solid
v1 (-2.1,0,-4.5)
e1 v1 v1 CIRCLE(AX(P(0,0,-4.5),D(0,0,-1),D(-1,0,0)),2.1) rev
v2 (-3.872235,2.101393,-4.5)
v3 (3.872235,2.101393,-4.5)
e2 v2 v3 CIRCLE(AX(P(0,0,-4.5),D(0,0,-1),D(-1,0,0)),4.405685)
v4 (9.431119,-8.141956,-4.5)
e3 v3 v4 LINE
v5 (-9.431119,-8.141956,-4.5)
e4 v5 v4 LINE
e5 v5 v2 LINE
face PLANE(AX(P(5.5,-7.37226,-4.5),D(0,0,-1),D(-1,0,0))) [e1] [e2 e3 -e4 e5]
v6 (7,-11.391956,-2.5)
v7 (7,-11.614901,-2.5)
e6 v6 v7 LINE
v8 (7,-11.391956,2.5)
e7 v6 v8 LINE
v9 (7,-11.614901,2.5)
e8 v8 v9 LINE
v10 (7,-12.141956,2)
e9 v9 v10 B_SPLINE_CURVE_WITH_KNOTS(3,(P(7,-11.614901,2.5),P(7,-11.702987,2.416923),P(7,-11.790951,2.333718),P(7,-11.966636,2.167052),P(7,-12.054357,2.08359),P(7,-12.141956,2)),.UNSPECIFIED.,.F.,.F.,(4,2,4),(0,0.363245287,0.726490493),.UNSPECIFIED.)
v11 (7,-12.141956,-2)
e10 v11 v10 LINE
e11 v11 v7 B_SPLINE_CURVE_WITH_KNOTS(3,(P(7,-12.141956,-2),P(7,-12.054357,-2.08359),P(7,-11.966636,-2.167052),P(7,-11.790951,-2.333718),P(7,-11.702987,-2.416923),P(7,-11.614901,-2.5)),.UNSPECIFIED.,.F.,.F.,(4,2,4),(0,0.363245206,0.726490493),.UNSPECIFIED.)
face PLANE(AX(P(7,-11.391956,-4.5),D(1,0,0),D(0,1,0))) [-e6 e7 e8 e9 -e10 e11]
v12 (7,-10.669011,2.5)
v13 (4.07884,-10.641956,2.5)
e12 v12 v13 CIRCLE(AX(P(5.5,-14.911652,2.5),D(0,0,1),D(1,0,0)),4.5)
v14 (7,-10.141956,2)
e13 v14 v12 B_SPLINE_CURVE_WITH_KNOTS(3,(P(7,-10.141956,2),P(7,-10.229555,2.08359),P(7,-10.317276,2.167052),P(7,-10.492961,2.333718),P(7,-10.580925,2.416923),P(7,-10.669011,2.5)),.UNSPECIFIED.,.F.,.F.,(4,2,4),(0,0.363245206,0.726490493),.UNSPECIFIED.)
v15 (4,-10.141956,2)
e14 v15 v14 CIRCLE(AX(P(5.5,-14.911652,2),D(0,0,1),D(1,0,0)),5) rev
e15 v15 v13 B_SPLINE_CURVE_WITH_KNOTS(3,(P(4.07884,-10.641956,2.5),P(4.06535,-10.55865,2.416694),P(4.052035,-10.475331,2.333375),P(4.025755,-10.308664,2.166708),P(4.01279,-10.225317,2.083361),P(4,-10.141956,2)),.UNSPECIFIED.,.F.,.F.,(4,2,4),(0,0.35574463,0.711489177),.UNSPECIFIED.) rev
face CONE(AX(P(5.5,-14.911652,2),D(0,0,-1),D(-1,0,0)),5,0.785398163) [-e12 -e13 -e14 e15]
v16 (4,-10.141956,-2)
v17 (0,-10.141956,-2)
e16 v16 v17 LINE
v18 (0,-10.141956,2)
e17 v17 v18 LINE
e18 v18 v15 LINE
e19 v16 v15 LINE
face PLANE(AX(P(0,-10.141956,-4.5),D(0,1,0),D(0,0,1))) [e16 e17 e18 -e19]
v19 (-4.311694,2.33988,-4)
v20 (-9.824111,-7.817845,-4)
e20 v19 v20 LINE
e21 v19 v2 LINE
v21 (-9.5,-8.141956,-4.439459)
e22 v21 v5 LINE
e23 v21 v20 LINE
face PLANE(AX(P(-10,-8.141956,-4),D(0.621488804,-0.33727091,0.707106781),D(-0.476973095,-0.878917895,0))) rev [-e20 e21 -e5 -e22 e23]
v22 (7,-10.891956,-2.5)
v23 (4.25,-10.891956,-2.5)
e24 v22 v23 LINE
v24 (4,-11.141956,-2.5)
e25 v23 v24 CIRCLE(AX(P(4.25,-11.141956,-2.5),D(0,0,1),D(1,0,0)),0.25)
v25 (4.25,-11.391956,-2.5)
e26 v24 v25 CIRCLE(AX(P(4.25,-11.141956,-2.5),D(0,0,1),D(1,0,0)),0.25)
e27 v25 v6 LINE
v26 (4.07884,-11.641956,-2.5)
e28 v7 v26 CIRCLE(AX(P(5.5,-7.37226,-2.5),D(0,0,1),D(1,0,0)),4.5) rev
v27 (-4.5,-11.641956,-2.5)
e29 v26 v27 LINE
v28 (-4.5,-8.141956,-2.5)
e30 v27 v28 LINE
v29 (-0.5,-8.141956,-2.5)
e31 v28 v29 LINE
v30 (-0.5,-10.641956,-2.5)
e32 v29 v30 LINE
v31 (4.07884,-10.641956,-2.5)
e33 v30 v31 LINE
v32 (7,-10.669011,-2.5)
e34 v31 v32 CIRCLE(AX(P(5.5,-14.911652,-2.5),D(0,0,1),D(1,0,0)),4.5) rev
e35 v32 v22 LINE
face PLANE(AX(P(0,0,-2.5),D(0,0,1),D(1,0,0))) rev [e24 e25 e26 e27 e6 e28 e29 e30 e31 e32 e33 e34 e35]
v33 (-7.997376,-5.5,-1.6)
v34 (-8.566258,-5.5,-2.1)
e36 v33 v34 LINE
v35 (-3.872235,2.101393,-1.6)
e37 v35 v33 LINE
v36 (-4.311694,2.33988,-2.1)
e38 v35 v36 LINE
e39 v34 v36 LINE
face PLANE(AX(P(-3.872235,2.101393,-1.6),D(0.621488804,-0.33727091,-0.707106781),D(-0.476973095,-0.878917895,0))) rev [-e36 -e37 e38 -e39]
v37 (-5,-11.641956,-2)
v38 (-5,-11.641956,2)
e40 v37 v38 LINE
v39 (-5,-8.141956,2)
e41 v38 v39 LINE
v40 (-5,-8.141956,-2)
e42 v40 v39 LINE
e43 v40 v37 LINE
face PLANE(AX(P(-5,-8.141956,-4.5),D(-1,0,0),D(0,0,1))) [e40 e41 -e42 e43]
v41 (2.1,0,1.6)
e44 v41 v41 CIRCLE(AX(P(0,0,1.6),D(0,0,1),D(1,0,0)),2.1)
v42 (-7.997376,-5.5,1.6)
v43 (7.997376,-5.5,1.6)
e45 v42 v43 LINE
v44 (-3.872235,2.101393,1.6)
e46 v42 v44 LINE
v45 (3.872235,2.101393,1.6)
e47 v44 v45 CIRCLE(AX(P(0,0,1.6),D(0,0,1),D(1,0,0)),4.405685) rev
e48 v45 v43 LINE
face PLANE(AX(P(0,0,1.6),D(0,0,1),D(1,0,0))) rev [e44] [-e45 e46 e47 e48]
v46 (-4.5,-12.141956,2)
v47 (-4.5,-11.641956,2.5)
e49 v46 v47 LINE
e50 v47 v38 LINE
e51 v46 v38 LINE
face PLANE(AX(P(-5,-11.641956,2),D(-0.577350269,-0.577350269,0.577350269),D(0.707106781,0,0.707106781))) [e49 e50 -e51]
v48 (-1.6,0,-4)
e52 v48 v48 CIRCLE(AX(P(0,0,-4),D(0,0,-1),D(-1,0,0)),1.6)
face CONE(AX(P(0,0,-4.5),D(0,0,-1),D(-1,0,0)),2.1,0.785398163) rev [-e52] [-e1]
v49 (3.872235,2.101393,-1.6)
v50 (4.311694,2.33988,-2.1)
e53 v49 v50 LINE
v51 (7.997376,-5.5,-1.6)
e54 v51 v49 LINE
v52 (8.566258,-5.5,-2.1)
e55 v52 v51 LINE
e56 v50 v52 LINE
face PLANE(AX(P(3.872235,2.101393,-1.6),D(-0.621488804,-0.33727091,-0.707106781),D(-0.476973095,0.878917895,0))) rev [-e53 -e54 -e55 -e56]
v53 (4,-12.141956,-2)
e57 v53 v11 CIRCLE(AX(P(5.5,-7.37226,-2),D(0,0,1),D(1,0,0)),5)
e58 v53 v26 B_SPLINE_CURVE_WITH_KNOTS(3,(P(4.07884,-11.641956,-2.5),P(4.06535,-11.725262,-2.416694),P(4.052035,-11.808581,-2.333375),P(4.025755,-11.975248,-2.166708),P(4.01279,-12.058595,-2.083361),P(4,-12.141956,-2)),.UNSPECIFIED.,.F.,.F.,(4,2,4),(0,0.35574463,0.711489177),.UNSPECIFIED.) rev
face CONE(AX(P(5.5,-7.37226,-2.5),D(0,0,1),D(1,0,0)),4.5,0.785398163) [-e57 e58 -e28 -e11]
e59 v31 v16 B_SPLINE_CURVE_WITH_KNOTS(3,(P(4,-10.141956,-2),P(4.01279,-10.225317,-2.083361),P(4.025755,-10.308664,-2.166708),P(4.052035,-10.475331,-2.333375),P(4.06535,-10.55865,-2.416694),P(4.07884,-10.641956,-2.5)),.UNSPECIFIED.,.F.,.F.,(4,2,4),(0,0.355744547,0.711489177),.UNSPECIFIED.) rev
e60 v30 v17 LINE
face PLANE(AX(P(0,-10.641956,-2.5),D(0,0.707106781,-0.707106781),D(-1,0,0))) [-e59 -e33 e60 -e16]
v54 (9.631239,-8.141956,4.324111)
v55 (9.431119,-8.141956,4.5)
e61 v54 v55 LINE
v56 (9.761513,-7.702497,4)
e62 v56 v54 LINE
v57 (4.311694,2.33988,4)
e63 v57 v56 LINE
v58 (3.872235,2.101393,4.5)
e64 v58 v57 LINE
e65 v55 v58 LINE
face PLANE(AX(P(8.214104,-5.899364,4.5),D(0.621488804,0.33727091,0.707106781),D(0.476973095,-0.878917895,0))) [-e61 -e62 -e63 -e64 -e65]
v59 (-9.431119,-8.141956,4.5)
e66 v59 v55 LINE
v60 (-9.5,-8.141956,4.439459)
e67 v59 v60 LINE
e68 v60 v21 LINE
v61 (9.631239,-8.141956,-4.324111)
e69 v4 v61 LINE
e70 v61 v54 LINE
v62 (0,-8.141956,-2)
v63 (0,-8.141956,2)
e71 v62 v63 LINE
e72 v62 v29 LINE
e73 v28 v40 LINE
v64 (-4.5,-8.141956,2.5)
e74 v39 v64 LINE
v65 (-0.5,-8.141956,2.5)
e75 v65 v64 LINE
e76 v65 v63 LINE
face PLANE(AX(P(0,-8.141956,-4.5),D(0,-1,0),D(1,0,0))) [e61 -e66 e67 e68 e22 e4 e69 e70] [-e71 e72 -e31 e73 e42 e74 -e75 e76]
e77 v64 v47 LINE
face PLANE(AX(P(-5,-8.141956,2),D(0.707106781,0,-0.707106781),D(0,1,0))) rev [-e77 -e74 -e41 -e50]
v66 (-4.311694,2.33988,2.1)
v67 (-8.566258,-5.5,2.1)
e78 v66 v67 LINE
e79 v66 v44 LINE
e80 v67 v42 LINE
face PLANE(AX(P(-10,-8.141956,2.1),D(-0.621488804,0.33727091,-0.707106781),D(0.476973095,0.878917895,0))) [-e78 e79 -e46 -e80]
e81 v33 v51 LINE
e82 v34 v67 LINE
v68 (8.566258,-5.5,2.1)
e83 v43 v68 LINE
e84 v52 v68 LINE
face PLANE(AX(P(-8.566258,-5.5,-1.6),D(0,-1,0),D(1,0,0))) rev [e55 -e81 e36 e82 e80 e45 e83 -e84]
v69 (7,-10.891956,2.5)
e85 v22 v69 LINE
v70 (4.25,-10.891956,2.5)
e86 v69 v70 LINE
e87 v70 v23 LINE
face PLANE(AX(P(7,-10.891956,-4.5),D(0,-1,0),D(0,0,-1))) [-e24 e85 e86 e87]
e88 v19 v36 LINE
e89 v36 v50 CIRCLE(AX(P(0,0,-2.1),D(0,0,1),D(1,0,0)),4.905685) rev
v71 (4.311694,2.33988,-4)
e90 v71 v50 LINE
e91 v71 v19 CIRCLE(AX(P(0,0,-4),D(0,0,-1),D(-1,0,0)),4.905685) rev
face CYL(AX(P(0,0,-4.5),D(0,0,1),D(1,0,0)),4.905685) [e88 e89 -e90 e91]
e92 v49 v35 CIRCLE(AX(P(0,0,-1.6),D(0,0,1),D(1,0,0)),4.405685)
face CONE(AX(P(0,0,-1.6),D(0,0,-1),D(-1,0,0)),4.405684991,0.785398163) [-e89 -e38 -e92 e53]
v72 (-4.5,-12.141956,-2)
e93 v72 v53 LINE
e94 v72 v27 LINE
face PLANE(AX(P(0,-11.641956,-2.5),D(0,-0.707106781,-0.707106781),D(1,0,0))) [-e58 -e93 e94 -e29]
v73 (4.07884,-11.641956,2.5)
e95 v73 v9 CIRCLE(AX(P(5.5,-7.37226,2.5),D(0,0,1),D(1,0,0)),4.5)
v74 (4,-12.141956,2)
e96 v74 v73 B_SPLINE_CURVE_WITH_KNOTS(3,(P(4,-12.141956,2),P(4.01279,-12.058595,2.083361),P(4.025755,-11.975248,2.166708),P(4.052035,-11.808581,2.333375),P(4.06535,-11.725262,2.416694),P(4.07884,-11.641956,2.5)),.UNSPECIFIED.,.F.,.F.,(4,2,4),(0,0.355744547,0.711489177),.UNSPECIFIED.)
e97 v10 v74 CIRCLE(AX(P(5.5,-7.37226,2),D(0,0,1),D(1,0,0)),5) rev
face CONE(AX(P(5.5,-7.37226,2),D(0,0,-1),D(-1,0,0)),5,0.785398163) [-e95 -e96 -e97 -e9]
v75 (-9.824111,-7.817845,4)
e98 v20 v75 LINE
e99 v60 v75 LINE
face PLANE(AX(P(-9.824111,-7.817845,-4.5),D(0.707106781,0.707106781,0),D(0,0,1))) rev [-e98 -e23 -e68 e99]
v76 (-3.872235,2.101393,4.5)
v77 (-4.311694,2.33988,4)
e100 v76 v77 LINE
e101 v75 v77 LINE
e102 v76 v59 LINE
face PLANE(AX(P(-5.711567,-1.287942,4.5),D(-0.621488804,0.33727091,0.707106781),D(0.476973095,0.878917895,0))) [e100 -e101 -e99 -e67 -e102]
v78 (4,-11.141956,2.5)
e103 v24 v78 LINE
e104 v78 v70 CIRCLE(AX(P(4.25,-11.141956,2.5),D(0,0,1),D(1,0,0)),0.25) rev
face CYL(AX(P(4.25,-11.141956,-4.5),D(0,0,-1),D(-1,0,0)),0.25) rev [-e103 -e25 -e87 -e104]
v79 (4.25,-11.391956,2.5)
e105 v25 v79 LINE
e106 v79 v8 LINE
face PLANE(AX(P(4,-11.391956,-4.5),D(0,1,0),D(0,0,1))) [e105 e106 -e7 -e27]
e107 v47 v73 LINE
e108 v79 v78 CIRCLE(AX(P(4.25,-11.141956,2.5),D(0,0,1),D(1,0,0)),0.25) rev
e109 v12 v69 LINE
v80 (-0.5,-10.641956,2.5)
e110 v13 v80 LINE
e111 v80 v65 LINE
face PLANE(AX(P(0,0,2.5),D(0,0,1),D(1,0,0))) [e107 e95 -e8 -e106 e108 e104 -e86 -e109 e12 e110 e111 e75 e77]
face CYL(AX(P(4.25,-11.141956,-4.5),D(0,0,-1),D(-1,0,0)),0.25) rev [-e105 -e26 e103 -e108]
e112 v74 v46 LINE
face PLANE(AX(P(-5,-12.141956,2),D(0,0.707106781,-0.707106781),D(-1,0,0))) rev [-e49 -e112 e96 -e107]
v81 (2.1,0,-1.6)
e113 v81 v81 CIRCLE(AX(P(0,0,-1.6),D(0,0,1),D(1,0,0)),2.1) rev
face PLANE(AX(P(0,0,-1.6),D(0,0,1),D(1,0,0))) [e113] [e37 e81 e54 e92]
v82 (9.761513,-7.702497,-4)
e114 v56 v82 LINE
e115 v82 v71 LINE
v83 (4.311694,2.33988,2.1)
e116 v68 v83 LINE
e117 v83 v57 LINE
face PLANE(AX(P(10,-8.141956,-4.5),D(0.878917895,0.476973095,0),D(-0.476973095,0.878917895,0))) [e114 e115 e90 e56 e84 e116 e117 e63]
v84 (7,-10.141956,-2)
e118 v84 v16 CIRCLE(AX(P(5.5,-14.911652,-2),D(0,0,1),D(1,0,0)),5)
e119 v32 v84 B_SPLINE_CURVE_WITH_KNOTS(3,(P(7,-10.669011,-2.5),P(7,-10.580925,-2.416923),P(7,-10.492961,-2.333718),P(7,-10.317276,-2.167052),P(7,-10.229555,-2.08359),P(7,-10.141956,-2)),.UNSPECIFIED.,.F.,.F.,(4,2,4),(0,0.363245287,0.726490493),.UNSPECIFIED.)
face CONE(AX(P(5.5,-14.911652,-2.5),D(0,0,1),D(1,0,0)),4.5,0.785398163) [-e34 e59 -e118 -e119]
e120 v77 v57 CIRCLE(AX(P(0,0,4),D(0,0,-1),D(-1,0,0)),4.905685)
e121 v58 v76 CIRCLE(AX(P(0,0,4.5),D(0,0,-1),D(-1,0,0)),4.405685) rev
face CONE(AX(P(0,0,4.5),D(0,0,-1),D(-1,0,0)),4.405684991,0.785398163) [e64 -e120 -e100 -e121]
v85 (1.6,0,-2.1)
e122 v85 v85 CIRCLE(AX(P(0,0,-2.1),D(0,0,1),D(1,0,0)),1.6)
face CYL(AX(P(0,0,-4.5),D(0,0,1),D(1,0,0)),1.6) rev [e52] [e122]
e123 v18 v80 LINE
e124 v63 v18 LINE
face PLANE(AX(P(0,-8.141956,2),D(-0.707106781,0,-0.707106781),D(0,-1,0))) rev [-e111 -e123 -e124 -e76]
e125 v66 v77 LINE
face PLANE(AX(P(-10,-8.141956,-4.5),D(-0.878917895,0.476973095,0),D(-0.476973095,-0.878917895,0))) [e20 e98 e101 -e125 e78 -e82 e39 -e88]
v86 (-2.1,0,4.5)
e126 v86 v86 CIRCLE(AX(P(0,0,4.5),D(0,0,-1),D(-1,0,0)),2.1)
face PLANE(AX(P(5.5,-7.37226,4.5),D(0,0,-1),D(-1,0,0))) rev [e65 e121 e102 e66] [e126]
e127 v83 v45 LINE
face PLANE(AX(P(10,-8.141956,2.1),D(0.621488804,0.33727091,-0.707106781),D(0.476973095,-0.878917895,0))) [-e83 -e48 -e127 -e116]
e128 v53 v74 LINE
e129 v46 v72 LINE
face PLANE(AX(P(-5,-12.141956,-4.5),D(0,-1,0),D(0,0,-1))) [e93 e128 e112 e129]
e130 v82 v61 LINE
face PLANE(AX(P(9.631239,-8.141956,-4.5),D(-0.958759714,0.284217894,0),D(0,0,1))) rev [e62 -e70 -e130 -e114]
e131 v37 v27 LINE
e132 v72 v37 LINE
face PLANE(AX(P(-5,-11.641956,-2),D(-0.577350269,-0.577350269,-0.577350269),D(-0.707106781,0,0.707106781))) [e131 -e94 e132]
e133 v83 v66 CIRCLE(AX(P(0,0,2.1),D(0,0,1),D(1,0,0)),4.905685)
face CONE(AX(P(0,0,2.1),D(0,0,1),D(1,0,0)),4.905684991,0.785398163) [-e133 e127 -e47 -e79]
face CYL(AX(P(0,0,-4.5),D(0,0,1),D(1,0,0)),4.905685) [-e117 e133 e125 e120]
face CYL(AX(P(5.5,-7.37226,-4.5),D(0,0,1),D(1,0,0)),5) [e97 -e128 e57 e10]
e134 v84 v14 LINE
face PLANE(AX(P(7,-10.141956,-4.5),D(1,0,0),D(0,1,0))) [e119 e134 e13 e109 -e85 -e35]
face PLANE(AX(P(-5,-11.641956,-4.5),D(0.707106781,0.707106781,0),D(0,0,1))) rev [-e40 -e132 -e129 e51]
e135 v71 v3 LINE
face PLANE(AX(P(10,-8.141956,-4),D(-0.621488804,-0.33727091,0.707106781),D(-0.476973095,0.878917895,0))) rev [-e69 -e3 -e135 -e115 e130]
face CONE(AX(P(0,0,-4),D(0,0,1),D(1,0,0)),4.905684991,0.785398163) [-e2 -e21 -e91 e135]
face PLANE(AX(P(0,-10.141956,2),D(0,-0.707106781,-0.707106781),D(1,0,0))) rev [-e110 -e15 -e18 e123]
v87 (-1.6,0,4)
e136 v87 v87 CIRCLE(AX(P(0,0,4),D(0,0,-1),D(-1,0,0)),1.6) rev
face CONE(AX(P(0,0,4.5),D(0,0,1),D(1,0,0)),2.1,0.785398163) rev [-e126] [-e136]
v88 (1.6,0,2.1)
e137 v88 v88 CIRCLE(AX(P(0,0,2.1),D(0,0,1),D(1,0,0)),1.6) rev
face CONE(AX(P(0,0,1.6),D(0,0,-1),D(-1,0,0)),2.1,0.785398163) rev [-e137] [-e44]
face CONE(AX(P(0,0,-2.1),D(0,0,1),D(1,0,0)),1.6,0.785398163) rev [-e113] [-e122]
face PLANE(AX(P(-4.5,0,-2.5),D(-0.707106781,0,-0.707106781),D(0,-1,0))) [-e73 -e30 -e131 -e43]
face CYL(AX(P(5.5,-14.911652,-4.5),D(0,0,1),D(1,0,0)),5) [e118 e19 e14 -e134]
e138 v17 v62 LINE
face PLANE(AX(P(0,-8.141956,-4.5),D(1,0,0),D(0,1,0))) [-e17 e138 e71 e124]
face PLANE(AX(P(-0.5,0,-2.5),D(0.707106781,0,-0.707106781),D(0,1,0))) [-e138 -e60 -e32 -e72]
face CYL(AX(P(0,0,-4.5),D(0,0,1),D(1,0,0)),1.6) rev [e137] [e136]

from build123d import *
from OCP.BRepFilletAPI import BRepFilletAPI_MakeChamfer

# Parameters (mm, degrees)
BOSS_EXTRUDE1_DEPTH      = 4.5
BOSS_EXTRUDE1_DEPTH_BACK = 4.5
CUT_EXTRUDE1_START       = -6.1
CUT_EXTRUDE1_DEPTH       = 3.2
CUT_EXTRUDE2_DEPTH       = 19.277658975
CUT_EXTRUDE2_DEPTH_BACK  = 19.277658975
SKETCH3_R                = 1.6
SKETCH4_W                = 20
SKETCH4_H                = 4.97497426
CUT_EXTRUDE3_DEPTH       = 2
SKETCH5_W                = 20
SKETCH5_H                = 5.22601356
CUT_EXTRUDE4_DEPTH       = 2
FILLET1_R                = 0.25
CHAMFER1_SIZE            = 0.5
CHAMFER1_SIZE2           = 0.368761208
CHAMFER2_SIZE            = 0.5


with BuildPart() as part:
    # Sketch1 → Boss-Extrude1 (new, two sides: drawn at the far end of the back side and taken through both)
    with BuildSketch(Plane.XY.offset(-BOSS_EXTRUDE1_DEPTH_BACK)):
        with BuildLine():
            Line((-10, -8.141956011), (-4.311694326, 2.339879755))
            ThreePointArc((-4.311694326, 2.339879755), (0, 4.905684991), (4.311694326, 2.339879755))
            Line((4.311694326, 2.339879755), (10, -8.141956011))
            Line((10, -8.141956011), (0, -8.141956011))
            Line((0, -8.141956011), (0, -10.141956011))
            Line((0, -10.141956011), (4, -10.141956011))
            ThreePointArc((4, -10.141956011), (5.5, -9.911652018), (7, -10.141956011))
            Line((7, -10.141956011), (7, -10.891956011))
            Line((7, -10.891956011), (4, -10.891956011))
            Line((4, -10.891956011), (4, -11.391956011))
            Line((4, -11.391956011), (7, -11.391956011))
            Line((7, -11.391956011), (7, -12.141956011))
            ThreePointArc((7, -12.141956011), (5.5, -12.372260004), (4, -12.141956011))
            Line((4, -12.141956011), (-5, -12.141956011))
            Line((-5, -12.141956011), (-5, -8.141956011))
            Line((-5, -8.141956011), (-10, -8.141956011))
        make_face()
    extrude(amount=BOSS_EXTRUDE1_DEPTH + BOSS_EXTRUDE1_DEPTH_BACK)

    # Sketch2 → Cut-Extrude1 (cut)
    with BuildSketch(Plane.XY.offset(4.5).offset(CUT_EXTRUDE1_START)):
        with BuildLine():
            Line((8.566257505, -5.5), (4.311694326, 2.339879755))
            ThreePointArc((4.311694326, 2.339879755), (0, 4.905684991), (-4.311694326, 2.339879755))
            Line((-4.311694326, 2.339879755), (-8.566257505, -5.5))
            Line((-8.566257505, -5.5), (8.566257505, -5.5))
        make_face()
    extrude(amount=CUT_EXTRUDE1_DEPTH, mode=Mode.SUBTRACT)

    # Sketch3 → Cut-Extrude2 (cut, two sides: drawn at the far end of the back side and taken through both)
    with BuildSketch(Plane.XY.offset(4.5).offset(-CUT_EXTRUDE2_DEPTH_BACK)):
        Circle(SKETCH3_R)
    extrude(amount=CUT_EXTRUDE2_DEPTH + CUT_EXTRUDE2_DEPTH_BACK, mode=Mode.SUBTRACT)

    # Sketch4 → Cut-Extrude3 (cut)
    with BuildSketch(Plane.XY.offset(4.5)):
        with Locations((0, -10.629443141)):
            Rectangle(SKETCH4_W, SKETCH4_H)
    extrude(amount=-CUT_EXTRUDE3_DEPTH, mode=Mode.SUBTRACT)

    # Sketch5 → Cut-Extrude4 (cut)
    with BuildSketch(Plane(origin=(0, 0, -4.5), x_dir=(-1, 0, 0), z_dir=(0, 0, -1))):
        with Locations((0, -10.754962791)):
            Rectangle(SKETCH5_W, SKETCH5_H)
    extrude(amount=-CUT_EXTRUDE4_DEPTH, mode=Mode.SUBTRACT)

    # Fillet1
    fillet1_edges = [part.edges().sort_by_distance(p)[0] for p in [
        (4, -11.391956011, 0),
        (4, -10.891956011, 0),
    ]]
    fillet(fillet1_edges, radius=FILLET1_R - 0.0001)  # a hair under: the kernel refuses the full size

    # Chamfer1: one chamfer whose edges measure the first distance from different faces: ONE call of the kernel's chamfer builder (chamfer() names one face for all edges)
    chamfer1_edges_1 = [part.edges().sort_by_distance(p)[0] for p in [
        (-10, -8.141956011, 0),
    ]]
    chamfer1_side_1 = [part.faces().sort_by_distance(p)[0] for p in [
        (0.403225806, -8.141956011, 0),
    ]]
    chamfer1_edges_2 = [part.edges().sort_by_distance(p)[0] for p in [
        (10, -8.141956011, 0),
    ]]
    chamfer1_side_2 = [part.faces().sort_by_distance(p)[0] for p in [
        (4.382957635, 2.20856292, 3.05),
    ]]
    chamfer1_edges_3 = [part.edges().sort_by_distance(p)[0] for p in [
        (7.155847163, -2.901038128, -4.5),
        (0, 4.905684991, -4.5),
        (7.155847163, -2.901038128, 4.5),
        (0, 4.905684991, 4.5),
        (-7.155847163, -2.901038128, 4.5),
        (-7.155847163, -2.901038128, -4.5),
        (0, 4.905684991, -1.6),
        (6.438975915, -1.580060123, -1.6),
        (-6.438975915, -1.580060123, -1.6),
        (0, 4.905684991, 1.6),
        (-6.438975915, -1.580060123, 1.6),
        (6.438975915, -1.580060123, 1.6),
        (-1.6, 0, 1.6),
        (-1.6, 0, 4.5),
        (-1.6, 0, -1.6),
        (-1.6, 0, -4.5),
    ]]
    chamfer1 = BRepFilletAPI_MakeChamfer(part.part.solid().wrapped)
    for e in chamfer1_edges_1:
        chamfer1.Add(CHAMFER1_SIZE, CHAMFER1_SIZE2, e.wrapped, chamfer1_side_1[0].wrapped)  # the first distance lies on this face
    for e in chamfer1_edges_2:
        chamfer1.Add(CHAMFER1_SIZE, CHAMFER1_SIZE2, e.wrapped, chamfer1_side_2[0].wrapped)  # the first distance lies on this face
    for e in chamfer1_edges_3:
        chamfer1.Add(CHAMFER1_SIZE, e.wrapped)
    add(Compound.cast(chamfer1.Shape()), mode=Mode.REPLACE)

    # Chamfer2
    chamfer2_edges = [part.edges().sort_by_distance(p)[0] for p in [
        (-5, -10.141956011, 2.5),
        (0, -9.141956011, 2.5),
        (2, -10.141956011, 2.5),
        (5.5, -9.911652018, 2.5),
        (5.5, -12.372260004, 2.5),
        (-0.5, -12.141956011, 2.5),
        (-5, -12.141956011, 0),
        (0, -9.141956011, -2.5),
        (2, -10.141956011, -2.5),
        (5.5, -9.911652018, -2.5),
        (5.5, -12.372260004, -2.5),
        (-0.5, -12.141956011, -2.5),
        (-5, -10.141956011, -2.5),
    ]]
    chamfer(chamfer2_edges, length=CHAMFER2_SIZE)


solid = part.part
